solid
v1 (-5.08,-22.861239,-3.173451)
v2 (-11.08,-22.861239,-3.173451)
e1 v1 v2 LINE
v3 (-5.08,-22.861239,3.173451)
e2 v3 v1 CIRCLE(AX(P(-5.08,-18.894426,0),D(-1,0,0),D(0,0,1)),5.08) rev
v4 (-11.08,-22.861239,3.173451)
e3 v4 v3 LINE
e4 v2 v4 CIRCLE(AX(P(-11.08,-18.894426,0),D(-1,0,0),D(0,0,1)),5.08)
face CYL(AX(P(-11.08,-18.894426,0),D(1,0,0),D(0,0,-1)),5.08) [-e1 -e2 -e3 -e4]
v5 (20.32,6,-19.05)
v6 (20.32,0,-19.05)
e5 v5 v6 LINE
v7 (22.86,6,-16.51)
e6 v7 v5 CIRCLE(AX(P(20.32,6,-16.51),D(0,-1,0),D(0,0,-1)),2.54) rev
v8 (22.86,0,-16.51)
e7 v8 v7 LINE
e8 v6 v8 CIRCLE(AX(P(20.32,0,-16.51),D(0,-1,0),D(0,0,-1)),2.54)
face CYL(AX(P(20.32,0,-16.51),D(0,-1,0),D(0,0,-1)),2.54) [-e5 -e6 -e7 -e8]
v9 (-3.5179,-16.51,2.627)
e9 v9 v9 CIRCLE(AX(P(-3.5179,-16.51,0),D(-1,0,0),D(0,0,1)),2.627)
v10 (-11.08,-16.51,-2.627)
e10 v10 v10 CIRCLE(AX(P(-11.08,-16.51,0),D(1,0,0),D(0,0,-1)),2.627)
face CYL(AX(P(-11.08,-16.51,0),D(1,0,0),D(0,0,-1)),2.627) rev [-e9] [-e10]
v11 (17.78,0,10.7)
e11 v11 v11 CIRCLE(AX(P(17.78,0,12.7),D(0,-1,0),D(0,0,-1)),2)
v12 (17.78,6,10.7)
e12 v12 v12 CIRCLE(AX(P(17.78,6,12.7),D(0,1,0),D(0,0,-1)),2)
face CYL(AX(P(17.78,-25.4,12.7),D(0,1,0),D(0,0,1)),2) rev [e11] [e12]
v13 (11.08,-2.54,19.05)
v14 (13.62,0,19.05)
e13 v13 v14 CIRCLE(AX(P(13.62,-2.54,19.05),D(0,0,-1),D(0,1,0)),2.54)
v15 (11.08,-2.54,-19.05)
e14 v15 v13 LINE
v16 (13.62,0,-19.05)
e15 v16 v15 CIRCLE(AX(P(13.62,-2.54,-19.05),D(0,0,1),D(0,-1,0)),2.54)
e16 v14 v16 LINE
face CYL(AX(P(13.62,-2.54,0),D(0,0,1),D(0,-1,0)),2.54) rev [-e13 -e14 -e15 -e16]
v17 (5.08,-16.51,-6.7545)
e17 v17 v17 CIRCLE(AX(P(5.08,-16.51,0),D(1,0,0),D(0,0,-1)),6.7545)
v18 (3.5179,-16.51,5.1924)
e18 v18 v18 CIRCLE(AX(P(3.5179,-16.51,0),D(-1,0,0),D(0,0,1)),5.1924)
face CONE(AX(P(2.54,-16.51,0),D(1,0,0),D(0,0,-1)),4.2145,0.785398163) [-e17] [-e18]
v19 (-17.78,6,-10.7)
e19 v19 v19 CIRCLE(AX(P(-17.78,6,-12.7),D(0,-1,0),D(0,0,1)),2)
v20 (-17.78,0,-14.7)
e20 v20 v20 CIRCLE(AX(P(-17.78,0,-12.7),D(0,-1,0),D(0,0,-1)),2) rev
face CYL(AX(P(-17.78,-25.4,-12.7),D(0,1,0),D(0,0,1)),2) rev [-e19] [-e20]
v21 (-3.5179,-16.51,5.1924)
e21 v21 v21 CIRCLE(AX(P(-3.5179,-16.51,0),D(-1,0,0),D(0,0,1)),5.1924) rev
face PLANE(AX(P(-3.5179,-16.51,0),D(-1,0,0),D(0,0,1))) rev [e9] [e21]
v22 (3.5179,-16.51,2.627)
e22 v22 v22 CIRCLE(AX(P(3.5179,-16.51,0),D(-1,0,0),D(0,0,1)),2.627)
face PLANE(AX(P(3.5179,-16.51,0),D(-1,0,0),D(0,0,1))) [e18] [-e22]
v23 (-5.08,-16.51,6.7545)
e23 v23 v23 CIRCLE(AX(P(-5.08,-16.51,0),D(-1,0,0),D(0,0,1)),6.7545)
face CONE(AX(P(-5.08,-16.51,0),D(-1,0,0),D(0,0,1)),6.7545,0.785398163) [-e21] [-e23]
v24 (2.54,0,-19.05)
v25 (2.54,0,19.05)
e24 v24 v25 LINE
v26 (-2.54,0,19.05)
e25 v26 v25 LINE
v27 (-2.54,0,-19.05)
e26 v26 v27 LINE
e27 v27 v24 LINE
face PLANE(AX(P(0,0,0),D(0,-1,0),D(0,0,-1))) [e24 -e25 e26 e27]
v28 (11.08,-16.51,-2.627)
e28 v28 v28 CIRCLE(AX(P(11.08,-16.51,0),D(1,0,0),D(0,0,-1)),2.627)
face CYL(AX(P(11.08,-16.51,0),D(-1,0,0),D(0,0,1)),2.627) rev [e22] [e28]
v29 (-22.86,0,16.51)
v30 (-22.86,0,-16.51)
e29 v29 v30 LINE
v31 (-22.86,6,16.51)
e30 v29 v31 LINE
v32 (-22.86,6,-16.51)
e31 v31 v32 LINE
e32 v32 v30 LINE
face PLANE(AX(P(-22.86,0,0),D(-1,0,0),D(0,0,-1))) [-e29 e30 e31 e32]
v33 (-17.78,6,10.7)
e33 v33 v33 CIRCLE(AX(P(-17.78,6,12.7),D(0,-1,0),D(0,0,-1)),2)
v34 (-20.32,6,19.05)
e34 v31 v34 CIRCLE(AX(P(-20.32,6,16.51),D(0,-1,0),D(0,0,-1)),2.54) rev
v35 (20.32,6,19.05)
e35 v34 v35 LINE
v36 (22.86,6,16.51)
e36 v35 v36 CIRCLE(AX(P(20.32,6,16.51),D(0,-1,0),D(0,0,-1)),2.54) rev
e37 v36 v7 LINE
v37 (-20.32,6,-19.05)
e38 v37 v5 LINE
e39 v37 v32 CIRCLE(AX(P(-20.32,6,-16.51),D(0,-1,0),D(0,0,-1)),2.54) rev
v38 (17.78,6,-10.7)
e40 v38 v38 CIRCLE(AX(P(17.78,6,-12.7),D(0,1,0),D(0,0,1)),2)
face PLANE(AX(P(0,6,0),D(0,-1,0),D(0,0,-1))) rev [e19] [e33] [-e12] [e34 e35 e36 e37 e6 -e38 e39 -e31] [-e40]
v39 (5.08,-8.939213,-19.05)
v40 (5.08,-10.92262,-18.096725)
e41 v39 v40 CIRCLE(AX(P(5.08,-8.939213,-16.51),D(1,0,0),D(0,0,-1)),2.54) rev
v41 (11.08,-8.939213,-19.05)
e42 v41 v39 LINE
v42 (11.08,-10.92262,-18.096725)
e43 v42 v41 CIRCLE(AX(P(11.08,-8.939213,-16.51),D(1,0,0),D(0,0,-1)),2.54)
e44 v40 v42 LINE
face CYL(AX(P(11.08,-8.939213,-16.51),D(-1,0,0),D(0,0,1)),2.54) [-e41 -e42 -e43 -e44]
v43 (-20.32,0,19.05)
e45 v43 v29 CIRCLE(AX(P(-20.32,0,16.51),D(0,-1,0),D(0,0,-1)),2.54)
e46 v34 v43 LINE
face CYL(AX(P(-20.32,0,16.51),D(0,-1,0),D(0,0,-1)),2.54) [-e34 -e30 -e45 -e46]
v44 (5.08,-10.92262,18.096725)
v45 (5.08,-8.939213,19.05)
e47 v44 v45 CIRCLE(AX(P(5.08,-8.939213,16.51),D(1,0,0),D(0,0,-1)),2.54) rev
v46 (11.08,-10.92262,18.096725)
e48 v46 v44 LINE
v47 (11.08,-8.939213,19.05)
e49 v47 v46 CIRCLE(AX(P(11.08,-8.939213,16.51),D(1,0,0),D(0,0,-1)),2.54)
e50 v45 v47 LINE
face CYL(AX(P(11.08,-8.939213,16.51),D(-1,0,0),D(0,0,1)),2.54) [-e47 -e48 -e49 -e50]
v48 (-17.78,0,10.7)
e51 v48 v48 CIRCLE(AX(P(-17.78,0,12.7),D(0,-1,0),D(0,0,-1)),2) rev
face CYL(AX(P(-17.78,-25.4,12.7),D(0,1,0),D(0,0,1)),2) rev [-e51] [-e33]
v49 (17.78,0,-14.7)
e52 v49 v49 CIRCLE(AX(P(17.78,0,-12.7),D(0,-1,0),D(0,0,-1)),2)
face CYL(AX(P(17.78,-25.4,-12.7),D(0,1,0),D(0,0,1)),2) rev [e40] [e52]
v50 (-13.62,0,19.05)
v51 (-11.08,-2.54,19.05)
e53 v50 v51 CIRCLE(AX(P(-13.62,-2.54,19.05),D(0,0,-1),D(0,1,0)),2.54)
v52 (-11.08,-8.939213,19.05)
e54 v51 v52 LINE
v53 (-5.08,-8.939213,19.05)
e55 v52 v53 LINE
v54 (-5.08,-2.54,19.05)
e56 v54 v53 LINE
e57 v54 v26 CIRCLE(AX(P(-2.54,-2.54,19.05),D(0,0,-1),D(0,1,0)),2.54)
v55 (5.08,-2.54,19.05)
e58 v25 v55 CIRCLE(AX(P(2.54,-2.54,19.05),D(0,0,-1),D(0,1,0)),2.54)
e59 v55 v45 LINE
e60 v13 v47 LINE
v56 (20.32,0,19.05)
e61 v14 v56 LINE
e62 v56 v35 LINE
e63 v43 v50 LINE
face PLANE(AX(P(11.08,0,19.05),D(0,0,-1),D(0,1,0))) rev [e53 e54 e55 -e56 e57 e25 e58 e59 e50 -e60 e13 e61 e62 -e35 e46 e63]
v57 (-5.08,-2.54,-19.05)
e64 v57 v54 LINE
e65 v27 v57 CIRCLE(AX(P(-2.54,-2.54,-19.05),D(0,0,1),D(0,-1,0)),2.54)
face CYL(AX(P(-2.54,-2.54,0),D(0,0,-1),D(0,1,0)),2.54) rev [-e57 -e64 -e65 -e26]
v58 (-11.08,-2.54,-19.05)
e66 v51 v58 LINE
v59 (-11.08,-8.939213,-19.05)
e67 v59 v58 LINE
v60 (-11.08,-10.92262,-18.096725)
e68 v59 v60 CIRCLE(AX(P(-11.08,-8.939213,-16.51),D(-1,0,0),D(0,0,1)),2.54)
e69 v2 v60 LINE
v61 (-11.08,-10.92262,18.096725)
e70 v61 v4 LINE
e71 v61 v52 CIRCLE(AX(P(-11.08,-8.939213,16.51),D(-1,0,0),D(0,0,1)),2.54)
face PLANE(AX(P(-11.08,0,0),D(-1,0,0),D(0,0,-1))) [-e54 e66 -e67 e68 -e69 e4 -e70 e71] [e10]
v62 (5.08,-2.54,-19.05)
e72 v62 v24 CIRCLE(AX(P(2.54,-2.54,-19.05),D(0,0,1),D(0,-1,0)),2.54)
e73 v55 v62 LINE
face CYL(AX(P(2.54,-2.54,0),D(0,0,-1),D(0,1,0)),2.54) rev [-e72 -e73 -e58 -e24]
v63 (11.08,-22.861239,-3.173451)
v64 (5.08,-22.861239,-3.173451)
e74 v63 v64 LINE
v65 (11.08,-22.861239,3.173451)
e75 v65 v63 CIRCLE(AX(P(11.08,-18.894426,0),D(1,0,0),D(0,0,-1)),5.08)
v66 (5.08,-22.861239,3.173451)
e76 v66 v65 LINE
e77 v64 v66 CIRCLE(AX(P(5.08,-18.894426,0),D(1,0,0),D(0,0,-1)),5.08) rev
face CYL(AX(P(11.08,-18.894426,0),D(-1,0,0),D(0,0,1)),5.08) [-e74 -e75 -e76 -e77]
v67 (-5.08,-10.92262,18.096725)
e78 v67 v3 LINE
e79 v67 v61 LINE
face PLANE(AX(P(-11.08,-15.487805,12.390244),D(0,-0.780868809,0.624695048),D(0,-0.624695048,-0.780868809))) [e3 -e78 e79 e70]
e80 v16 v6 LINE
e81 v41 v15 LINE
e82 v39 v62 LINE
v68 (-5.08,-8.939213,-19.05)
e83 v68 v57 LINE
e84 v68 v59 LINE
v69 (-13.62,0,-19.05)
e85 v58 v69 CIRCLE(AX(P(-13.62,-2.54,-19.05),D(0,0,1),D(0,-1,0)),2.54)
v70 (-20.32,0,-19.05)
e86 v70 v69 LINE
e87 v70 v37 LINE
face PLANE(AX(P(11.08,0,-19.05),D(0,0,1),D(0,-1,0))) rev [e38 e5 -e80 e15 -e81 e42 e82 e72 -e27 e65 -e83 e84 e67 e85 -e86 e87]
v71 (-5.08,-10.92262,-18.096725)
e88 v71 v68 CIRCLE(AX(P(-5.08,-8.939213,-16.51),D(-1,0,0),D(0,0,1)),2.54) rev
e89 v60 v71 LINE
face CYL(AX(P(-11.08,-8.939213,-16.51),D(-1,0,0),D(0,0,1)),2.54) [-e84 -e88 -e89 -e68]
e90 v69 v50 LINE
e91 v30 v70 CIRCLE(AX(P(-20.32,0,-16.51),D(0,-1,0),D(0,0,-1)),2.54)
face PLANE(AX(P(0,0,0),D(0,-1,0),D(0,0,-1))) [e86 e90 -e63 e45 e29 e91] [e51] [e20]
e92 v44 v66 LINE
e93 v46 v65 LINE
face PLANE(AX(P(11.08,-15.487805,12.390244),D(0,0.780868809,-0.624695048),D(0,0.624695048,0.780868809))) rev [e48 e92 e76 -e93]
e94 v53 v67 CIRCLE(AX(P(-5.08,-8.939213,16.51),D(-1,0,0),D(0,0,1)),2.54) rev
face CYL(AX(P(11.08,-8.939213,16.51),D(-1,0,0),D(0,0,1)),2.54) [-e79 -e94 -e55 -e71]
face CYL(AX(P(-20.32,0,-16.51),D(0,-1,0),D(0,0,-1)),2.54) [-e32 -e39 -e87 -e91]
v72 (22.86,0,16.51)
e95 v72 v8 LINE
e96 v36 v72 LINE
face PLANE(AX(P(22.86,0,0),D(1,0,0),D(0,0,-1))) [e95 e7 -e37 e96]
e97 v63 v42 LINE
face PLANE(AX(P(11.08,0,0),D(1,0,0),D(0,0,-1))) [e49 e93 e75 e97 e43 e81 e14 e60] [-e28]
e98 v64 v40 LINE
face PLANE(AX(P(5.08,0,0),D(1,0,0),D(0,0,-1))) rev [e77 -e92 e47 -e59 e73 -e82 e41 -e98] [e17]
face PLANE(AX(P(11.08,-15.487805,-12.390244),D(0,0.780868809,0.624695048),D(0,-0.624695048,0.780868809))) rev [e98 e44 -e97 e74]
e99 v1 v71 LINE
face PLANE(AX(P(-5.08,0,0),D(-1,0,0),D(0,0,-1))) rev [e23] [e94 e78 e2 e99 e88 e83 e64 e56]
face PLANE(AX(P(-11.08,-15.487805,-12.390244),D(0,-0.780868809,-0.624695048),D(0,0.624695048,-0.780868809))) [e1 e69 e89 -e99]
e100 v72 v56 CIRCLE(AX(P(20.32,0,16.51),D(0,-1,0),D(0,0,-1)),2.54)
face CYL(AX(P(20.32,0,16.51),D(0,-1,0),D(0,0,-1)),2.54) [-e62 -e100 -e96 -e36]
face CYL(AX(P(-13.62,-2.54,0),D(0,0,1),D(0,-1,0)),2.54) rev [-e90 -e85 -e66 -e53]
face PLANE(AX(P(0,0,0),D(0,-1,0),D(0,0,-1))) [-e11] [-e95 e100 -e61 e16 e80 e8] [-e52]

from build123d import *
from OCP.BRepFilletAPI import BRepFilletAPI_MakeFillet

# Parameters (mm, degrees)
SKETCH1_R           = 2.627
BOSS_EXTRUDE1_DEPTH = 6
BOSS_EXTRUDE2_START = -5.08
SKETCH1_3_W         = 38.1
SKETCH1_3_H         = 5.999999938
BOSS_EXTRUDE2_DEPTH = 22.86
SKETCH3_R           = 2.000000064
CUT_EXTRUDE1_DEPTH  = 44.260167546
FILLET1_R1          = 2.54
FILLET1_R2          = 5.08
SKETCH4_R           = 4.2145
SKETCH4_R_2         = 2.627
BOSS_EXTRUDE3_DEPTH = 1.5621
BOSS_EXTRUDE4_START = 8.5979
SKETCH4_2_R         = 4.2145
SKETCH4_2_R_2       = 2.627
BOSS_EXTRUDE4_DEPTH = 1.5621
CHAMFER2_SIZE       = 2.54


with BuildPart() as part:
    # Sketch1 → Boss-Extrude1 (new body)
    with BuildSketch(Plane(origin=(5.08, 0, 0), x_dir=(0, 0, -1), z_dir=(1, 0, 0))):
        Polygon((-19.05, 0), (-19.05, -10.16), (0, -25.4), (19.05, -10.16), (19.05, 0), align=None)
        with Locations((0, -16.51)):
            Circle(SKETCH1_R, mode=Mode.SUBTRACT)
    boss_extrude1 = extrude(amount=BOSS_EXTRUDE1_DEPTH)

    # Sketch1<3> → Boss-Extrude2 (add)
    with BuildSketch(Plane(origin=(5.08, 0, 0), x_dir=(0, 0, -1), z_dir=(1, 0, 0)).offset(BOSS_EXTRUDE2_START)):
        with Locations((0, 2.999999969)):
            Rectangle(SKETCH1_3_W, SKETCH1_3_H)
    boss_extrude2 = extrude(amount=BOSS_EXTRUDE2_DEPTH)

    # Sketch3 → Cut-Extrude1 (cut, through all)
    with BuildSketch(Plane(origin=(0, 5.999999938, 0), x_dir=(1, 0, 0), z_dir=(0, 1, 0))):
        with Locations(Location((17.78, 12.7, 0), (0, 0, 270))):
            Circle(SKETCH3_R)
        with Locations(Location((17.78, -12.7, 0), (0, 0, 90))):
            Circle(SKETCH3_R)
    cut_extrude1 = extrude(amount=-CUT_EXTRUDE1_DEPTH, mode=Mode.SUBTRACT)

    # Mirror2: Boss-Extrude2, Cut-Extrude1 across plane
    add(boss_extrude2.mirror(Plane(origin=(0, 0, 0), x_dir=(0, 0, 1), z_dir=(1, 0, 0))))
    add(cut_extrude1.mirror(Plane(origin=(0, 0, 0), x_dir=(0, 0, 1), z_dir=(1, 0, 0))), mode=Mode.SUBTRACT)

    # Mirror3: Boss-Extrude1 across plane
    add(boss_extrude1.mirror(Plane(origin=(0, 0, 0), x_dir=(0, 0, 1), z_dir=(1, 0, 0))))

    # Fillet1: one fillet with a radius per group of edges: ONE call of the kernel's fillet builder (fillet() takes one radius for all edges)
    fillet1_edges_1 = [part.edges().sort_by_distance(p)[0] for p in [
        (8.08, -10.16, 19.05),
        (8.08, -10.16, -19.05),
        (11.08, 0, 0),
        (22.86, 2.999999969, 19.05),
        (22.86, 2.999999969, -19.05),
        (-22.86, 2.999999969, -19.05),
        (-22.86, 2.999999969, 19.05),
        (-8.08, -10.16, -19.05),
        (-8.08, -10.16, 19.05),
        (-5.08, 0, 0),
        (-11.08, 0, 0),
        (5.08, 0, 0),
    ]]
    fillet1_edges_2 = [part.edges().sort_by_distance(p)[0] for p in [
        (8.08, -25.4, 0),
        (-8.08, -25.4, 0),
    ]]
    fillet1 = BRepFilletAPI_MakeFillet(part.part.solid().wrapped)
    for e in fillet1_edges_1:
        fillet1.Add(FILLET1_R1, e.wrapped)
    for e in fillet1_edges_2:
        fillet1.Add(FILLET1_R2, e.wrapped)
    add(Compound.cast(fillet1.Shape()), mode=Mode.REPLACE)

    # Sketch4 → Boss-Extrude3 (add)
    with BuildSketch(Plane.ZY.offset(-5.08)):
        with Locations(Location((0, -16.51, 0), (0, 0, 180))):
            Circle(SKETCH4_R)
        with Locations((0, -16.51)):
            Circle(SKETCH4_R_2, mode=Mode.SUBTRACT)
    extrude(amount=BOSS_EXTRUDE3_DEPTH)

    # Sketch4<2> → Boss-Extrude4 (add)
    with BuildSketch(Plane.ZY.offset(-5.08).offset(BOSS_EXTRUDE4_START)):
        with Locations(Location((0, -16.51, 0), (0, 0, 180))):
            Circle(SKETCH4_2_R)
        with Locations((0, -16.51)):
            Circle(SKETCH4_2_R_2, mode=Mode.SUBTRACT)
    extrude(amount=BOSS_EXTRUDE4_DEPTH)

    # Chamfer2
    # the kernel refuses this chamfer: 2.54 mm, written as the material it adds along each edge
    with BuildSketch(Plane(origin=(5.08, -16.51, 0), x_dir=(0, 0, -1), z_dir=(0, 1, 0))) as chamfer2_piece_1_section:
        Polygon((4.2145 + CHAMFER2_SIZE, 0), (4.2145, CHAMFER2_SIZE), (4.2145, 0), align=None)
    chamfer2_piece_1 = revolve(axis=Axis((5.08, -16.51, 0), (-1, 0, 0)), mode=Mode.PRIVATE)
    chamfer2_piece_1 = split(chamfer2_piece_1, bisect_by=Plane(origin=(3.5179, -16.51, 5.976913078), z_dir=(1, 0, 0)), keep=Keep.TOP, mode=Mode.PRIVATE)
    add(chamfer2_piece_1)
    with BuildSketch(Plane(origin=(-5.08, -16.51, 0), x_dir=(0, 0, -1), z_dir=(0, 1, 0))) as chamfer2_piece_2_section:
        Polygon((4.2145 + CHAMFER2_SIZE, 0), (4.2145, -CHAMFER2_SIZE), (4.2145, 0), align=None)
    chamfer2_piece_2 = revolve(axis=Axis((-5.08, -16.51, 0), (-1, 0, 0)), mode=Mode.PRIVATE)
    chamfer2_piece_2 = split(chamfer2_piece_2, bisect_by=Plane(origin=(-3.5179, -16.51, 5.976913078), z_dir=(-1, 0, 0)), keep=Keep.TOP, mode=Mode.PRIVATE)
    add(chamfer2_piece_2)


solid = part.part
